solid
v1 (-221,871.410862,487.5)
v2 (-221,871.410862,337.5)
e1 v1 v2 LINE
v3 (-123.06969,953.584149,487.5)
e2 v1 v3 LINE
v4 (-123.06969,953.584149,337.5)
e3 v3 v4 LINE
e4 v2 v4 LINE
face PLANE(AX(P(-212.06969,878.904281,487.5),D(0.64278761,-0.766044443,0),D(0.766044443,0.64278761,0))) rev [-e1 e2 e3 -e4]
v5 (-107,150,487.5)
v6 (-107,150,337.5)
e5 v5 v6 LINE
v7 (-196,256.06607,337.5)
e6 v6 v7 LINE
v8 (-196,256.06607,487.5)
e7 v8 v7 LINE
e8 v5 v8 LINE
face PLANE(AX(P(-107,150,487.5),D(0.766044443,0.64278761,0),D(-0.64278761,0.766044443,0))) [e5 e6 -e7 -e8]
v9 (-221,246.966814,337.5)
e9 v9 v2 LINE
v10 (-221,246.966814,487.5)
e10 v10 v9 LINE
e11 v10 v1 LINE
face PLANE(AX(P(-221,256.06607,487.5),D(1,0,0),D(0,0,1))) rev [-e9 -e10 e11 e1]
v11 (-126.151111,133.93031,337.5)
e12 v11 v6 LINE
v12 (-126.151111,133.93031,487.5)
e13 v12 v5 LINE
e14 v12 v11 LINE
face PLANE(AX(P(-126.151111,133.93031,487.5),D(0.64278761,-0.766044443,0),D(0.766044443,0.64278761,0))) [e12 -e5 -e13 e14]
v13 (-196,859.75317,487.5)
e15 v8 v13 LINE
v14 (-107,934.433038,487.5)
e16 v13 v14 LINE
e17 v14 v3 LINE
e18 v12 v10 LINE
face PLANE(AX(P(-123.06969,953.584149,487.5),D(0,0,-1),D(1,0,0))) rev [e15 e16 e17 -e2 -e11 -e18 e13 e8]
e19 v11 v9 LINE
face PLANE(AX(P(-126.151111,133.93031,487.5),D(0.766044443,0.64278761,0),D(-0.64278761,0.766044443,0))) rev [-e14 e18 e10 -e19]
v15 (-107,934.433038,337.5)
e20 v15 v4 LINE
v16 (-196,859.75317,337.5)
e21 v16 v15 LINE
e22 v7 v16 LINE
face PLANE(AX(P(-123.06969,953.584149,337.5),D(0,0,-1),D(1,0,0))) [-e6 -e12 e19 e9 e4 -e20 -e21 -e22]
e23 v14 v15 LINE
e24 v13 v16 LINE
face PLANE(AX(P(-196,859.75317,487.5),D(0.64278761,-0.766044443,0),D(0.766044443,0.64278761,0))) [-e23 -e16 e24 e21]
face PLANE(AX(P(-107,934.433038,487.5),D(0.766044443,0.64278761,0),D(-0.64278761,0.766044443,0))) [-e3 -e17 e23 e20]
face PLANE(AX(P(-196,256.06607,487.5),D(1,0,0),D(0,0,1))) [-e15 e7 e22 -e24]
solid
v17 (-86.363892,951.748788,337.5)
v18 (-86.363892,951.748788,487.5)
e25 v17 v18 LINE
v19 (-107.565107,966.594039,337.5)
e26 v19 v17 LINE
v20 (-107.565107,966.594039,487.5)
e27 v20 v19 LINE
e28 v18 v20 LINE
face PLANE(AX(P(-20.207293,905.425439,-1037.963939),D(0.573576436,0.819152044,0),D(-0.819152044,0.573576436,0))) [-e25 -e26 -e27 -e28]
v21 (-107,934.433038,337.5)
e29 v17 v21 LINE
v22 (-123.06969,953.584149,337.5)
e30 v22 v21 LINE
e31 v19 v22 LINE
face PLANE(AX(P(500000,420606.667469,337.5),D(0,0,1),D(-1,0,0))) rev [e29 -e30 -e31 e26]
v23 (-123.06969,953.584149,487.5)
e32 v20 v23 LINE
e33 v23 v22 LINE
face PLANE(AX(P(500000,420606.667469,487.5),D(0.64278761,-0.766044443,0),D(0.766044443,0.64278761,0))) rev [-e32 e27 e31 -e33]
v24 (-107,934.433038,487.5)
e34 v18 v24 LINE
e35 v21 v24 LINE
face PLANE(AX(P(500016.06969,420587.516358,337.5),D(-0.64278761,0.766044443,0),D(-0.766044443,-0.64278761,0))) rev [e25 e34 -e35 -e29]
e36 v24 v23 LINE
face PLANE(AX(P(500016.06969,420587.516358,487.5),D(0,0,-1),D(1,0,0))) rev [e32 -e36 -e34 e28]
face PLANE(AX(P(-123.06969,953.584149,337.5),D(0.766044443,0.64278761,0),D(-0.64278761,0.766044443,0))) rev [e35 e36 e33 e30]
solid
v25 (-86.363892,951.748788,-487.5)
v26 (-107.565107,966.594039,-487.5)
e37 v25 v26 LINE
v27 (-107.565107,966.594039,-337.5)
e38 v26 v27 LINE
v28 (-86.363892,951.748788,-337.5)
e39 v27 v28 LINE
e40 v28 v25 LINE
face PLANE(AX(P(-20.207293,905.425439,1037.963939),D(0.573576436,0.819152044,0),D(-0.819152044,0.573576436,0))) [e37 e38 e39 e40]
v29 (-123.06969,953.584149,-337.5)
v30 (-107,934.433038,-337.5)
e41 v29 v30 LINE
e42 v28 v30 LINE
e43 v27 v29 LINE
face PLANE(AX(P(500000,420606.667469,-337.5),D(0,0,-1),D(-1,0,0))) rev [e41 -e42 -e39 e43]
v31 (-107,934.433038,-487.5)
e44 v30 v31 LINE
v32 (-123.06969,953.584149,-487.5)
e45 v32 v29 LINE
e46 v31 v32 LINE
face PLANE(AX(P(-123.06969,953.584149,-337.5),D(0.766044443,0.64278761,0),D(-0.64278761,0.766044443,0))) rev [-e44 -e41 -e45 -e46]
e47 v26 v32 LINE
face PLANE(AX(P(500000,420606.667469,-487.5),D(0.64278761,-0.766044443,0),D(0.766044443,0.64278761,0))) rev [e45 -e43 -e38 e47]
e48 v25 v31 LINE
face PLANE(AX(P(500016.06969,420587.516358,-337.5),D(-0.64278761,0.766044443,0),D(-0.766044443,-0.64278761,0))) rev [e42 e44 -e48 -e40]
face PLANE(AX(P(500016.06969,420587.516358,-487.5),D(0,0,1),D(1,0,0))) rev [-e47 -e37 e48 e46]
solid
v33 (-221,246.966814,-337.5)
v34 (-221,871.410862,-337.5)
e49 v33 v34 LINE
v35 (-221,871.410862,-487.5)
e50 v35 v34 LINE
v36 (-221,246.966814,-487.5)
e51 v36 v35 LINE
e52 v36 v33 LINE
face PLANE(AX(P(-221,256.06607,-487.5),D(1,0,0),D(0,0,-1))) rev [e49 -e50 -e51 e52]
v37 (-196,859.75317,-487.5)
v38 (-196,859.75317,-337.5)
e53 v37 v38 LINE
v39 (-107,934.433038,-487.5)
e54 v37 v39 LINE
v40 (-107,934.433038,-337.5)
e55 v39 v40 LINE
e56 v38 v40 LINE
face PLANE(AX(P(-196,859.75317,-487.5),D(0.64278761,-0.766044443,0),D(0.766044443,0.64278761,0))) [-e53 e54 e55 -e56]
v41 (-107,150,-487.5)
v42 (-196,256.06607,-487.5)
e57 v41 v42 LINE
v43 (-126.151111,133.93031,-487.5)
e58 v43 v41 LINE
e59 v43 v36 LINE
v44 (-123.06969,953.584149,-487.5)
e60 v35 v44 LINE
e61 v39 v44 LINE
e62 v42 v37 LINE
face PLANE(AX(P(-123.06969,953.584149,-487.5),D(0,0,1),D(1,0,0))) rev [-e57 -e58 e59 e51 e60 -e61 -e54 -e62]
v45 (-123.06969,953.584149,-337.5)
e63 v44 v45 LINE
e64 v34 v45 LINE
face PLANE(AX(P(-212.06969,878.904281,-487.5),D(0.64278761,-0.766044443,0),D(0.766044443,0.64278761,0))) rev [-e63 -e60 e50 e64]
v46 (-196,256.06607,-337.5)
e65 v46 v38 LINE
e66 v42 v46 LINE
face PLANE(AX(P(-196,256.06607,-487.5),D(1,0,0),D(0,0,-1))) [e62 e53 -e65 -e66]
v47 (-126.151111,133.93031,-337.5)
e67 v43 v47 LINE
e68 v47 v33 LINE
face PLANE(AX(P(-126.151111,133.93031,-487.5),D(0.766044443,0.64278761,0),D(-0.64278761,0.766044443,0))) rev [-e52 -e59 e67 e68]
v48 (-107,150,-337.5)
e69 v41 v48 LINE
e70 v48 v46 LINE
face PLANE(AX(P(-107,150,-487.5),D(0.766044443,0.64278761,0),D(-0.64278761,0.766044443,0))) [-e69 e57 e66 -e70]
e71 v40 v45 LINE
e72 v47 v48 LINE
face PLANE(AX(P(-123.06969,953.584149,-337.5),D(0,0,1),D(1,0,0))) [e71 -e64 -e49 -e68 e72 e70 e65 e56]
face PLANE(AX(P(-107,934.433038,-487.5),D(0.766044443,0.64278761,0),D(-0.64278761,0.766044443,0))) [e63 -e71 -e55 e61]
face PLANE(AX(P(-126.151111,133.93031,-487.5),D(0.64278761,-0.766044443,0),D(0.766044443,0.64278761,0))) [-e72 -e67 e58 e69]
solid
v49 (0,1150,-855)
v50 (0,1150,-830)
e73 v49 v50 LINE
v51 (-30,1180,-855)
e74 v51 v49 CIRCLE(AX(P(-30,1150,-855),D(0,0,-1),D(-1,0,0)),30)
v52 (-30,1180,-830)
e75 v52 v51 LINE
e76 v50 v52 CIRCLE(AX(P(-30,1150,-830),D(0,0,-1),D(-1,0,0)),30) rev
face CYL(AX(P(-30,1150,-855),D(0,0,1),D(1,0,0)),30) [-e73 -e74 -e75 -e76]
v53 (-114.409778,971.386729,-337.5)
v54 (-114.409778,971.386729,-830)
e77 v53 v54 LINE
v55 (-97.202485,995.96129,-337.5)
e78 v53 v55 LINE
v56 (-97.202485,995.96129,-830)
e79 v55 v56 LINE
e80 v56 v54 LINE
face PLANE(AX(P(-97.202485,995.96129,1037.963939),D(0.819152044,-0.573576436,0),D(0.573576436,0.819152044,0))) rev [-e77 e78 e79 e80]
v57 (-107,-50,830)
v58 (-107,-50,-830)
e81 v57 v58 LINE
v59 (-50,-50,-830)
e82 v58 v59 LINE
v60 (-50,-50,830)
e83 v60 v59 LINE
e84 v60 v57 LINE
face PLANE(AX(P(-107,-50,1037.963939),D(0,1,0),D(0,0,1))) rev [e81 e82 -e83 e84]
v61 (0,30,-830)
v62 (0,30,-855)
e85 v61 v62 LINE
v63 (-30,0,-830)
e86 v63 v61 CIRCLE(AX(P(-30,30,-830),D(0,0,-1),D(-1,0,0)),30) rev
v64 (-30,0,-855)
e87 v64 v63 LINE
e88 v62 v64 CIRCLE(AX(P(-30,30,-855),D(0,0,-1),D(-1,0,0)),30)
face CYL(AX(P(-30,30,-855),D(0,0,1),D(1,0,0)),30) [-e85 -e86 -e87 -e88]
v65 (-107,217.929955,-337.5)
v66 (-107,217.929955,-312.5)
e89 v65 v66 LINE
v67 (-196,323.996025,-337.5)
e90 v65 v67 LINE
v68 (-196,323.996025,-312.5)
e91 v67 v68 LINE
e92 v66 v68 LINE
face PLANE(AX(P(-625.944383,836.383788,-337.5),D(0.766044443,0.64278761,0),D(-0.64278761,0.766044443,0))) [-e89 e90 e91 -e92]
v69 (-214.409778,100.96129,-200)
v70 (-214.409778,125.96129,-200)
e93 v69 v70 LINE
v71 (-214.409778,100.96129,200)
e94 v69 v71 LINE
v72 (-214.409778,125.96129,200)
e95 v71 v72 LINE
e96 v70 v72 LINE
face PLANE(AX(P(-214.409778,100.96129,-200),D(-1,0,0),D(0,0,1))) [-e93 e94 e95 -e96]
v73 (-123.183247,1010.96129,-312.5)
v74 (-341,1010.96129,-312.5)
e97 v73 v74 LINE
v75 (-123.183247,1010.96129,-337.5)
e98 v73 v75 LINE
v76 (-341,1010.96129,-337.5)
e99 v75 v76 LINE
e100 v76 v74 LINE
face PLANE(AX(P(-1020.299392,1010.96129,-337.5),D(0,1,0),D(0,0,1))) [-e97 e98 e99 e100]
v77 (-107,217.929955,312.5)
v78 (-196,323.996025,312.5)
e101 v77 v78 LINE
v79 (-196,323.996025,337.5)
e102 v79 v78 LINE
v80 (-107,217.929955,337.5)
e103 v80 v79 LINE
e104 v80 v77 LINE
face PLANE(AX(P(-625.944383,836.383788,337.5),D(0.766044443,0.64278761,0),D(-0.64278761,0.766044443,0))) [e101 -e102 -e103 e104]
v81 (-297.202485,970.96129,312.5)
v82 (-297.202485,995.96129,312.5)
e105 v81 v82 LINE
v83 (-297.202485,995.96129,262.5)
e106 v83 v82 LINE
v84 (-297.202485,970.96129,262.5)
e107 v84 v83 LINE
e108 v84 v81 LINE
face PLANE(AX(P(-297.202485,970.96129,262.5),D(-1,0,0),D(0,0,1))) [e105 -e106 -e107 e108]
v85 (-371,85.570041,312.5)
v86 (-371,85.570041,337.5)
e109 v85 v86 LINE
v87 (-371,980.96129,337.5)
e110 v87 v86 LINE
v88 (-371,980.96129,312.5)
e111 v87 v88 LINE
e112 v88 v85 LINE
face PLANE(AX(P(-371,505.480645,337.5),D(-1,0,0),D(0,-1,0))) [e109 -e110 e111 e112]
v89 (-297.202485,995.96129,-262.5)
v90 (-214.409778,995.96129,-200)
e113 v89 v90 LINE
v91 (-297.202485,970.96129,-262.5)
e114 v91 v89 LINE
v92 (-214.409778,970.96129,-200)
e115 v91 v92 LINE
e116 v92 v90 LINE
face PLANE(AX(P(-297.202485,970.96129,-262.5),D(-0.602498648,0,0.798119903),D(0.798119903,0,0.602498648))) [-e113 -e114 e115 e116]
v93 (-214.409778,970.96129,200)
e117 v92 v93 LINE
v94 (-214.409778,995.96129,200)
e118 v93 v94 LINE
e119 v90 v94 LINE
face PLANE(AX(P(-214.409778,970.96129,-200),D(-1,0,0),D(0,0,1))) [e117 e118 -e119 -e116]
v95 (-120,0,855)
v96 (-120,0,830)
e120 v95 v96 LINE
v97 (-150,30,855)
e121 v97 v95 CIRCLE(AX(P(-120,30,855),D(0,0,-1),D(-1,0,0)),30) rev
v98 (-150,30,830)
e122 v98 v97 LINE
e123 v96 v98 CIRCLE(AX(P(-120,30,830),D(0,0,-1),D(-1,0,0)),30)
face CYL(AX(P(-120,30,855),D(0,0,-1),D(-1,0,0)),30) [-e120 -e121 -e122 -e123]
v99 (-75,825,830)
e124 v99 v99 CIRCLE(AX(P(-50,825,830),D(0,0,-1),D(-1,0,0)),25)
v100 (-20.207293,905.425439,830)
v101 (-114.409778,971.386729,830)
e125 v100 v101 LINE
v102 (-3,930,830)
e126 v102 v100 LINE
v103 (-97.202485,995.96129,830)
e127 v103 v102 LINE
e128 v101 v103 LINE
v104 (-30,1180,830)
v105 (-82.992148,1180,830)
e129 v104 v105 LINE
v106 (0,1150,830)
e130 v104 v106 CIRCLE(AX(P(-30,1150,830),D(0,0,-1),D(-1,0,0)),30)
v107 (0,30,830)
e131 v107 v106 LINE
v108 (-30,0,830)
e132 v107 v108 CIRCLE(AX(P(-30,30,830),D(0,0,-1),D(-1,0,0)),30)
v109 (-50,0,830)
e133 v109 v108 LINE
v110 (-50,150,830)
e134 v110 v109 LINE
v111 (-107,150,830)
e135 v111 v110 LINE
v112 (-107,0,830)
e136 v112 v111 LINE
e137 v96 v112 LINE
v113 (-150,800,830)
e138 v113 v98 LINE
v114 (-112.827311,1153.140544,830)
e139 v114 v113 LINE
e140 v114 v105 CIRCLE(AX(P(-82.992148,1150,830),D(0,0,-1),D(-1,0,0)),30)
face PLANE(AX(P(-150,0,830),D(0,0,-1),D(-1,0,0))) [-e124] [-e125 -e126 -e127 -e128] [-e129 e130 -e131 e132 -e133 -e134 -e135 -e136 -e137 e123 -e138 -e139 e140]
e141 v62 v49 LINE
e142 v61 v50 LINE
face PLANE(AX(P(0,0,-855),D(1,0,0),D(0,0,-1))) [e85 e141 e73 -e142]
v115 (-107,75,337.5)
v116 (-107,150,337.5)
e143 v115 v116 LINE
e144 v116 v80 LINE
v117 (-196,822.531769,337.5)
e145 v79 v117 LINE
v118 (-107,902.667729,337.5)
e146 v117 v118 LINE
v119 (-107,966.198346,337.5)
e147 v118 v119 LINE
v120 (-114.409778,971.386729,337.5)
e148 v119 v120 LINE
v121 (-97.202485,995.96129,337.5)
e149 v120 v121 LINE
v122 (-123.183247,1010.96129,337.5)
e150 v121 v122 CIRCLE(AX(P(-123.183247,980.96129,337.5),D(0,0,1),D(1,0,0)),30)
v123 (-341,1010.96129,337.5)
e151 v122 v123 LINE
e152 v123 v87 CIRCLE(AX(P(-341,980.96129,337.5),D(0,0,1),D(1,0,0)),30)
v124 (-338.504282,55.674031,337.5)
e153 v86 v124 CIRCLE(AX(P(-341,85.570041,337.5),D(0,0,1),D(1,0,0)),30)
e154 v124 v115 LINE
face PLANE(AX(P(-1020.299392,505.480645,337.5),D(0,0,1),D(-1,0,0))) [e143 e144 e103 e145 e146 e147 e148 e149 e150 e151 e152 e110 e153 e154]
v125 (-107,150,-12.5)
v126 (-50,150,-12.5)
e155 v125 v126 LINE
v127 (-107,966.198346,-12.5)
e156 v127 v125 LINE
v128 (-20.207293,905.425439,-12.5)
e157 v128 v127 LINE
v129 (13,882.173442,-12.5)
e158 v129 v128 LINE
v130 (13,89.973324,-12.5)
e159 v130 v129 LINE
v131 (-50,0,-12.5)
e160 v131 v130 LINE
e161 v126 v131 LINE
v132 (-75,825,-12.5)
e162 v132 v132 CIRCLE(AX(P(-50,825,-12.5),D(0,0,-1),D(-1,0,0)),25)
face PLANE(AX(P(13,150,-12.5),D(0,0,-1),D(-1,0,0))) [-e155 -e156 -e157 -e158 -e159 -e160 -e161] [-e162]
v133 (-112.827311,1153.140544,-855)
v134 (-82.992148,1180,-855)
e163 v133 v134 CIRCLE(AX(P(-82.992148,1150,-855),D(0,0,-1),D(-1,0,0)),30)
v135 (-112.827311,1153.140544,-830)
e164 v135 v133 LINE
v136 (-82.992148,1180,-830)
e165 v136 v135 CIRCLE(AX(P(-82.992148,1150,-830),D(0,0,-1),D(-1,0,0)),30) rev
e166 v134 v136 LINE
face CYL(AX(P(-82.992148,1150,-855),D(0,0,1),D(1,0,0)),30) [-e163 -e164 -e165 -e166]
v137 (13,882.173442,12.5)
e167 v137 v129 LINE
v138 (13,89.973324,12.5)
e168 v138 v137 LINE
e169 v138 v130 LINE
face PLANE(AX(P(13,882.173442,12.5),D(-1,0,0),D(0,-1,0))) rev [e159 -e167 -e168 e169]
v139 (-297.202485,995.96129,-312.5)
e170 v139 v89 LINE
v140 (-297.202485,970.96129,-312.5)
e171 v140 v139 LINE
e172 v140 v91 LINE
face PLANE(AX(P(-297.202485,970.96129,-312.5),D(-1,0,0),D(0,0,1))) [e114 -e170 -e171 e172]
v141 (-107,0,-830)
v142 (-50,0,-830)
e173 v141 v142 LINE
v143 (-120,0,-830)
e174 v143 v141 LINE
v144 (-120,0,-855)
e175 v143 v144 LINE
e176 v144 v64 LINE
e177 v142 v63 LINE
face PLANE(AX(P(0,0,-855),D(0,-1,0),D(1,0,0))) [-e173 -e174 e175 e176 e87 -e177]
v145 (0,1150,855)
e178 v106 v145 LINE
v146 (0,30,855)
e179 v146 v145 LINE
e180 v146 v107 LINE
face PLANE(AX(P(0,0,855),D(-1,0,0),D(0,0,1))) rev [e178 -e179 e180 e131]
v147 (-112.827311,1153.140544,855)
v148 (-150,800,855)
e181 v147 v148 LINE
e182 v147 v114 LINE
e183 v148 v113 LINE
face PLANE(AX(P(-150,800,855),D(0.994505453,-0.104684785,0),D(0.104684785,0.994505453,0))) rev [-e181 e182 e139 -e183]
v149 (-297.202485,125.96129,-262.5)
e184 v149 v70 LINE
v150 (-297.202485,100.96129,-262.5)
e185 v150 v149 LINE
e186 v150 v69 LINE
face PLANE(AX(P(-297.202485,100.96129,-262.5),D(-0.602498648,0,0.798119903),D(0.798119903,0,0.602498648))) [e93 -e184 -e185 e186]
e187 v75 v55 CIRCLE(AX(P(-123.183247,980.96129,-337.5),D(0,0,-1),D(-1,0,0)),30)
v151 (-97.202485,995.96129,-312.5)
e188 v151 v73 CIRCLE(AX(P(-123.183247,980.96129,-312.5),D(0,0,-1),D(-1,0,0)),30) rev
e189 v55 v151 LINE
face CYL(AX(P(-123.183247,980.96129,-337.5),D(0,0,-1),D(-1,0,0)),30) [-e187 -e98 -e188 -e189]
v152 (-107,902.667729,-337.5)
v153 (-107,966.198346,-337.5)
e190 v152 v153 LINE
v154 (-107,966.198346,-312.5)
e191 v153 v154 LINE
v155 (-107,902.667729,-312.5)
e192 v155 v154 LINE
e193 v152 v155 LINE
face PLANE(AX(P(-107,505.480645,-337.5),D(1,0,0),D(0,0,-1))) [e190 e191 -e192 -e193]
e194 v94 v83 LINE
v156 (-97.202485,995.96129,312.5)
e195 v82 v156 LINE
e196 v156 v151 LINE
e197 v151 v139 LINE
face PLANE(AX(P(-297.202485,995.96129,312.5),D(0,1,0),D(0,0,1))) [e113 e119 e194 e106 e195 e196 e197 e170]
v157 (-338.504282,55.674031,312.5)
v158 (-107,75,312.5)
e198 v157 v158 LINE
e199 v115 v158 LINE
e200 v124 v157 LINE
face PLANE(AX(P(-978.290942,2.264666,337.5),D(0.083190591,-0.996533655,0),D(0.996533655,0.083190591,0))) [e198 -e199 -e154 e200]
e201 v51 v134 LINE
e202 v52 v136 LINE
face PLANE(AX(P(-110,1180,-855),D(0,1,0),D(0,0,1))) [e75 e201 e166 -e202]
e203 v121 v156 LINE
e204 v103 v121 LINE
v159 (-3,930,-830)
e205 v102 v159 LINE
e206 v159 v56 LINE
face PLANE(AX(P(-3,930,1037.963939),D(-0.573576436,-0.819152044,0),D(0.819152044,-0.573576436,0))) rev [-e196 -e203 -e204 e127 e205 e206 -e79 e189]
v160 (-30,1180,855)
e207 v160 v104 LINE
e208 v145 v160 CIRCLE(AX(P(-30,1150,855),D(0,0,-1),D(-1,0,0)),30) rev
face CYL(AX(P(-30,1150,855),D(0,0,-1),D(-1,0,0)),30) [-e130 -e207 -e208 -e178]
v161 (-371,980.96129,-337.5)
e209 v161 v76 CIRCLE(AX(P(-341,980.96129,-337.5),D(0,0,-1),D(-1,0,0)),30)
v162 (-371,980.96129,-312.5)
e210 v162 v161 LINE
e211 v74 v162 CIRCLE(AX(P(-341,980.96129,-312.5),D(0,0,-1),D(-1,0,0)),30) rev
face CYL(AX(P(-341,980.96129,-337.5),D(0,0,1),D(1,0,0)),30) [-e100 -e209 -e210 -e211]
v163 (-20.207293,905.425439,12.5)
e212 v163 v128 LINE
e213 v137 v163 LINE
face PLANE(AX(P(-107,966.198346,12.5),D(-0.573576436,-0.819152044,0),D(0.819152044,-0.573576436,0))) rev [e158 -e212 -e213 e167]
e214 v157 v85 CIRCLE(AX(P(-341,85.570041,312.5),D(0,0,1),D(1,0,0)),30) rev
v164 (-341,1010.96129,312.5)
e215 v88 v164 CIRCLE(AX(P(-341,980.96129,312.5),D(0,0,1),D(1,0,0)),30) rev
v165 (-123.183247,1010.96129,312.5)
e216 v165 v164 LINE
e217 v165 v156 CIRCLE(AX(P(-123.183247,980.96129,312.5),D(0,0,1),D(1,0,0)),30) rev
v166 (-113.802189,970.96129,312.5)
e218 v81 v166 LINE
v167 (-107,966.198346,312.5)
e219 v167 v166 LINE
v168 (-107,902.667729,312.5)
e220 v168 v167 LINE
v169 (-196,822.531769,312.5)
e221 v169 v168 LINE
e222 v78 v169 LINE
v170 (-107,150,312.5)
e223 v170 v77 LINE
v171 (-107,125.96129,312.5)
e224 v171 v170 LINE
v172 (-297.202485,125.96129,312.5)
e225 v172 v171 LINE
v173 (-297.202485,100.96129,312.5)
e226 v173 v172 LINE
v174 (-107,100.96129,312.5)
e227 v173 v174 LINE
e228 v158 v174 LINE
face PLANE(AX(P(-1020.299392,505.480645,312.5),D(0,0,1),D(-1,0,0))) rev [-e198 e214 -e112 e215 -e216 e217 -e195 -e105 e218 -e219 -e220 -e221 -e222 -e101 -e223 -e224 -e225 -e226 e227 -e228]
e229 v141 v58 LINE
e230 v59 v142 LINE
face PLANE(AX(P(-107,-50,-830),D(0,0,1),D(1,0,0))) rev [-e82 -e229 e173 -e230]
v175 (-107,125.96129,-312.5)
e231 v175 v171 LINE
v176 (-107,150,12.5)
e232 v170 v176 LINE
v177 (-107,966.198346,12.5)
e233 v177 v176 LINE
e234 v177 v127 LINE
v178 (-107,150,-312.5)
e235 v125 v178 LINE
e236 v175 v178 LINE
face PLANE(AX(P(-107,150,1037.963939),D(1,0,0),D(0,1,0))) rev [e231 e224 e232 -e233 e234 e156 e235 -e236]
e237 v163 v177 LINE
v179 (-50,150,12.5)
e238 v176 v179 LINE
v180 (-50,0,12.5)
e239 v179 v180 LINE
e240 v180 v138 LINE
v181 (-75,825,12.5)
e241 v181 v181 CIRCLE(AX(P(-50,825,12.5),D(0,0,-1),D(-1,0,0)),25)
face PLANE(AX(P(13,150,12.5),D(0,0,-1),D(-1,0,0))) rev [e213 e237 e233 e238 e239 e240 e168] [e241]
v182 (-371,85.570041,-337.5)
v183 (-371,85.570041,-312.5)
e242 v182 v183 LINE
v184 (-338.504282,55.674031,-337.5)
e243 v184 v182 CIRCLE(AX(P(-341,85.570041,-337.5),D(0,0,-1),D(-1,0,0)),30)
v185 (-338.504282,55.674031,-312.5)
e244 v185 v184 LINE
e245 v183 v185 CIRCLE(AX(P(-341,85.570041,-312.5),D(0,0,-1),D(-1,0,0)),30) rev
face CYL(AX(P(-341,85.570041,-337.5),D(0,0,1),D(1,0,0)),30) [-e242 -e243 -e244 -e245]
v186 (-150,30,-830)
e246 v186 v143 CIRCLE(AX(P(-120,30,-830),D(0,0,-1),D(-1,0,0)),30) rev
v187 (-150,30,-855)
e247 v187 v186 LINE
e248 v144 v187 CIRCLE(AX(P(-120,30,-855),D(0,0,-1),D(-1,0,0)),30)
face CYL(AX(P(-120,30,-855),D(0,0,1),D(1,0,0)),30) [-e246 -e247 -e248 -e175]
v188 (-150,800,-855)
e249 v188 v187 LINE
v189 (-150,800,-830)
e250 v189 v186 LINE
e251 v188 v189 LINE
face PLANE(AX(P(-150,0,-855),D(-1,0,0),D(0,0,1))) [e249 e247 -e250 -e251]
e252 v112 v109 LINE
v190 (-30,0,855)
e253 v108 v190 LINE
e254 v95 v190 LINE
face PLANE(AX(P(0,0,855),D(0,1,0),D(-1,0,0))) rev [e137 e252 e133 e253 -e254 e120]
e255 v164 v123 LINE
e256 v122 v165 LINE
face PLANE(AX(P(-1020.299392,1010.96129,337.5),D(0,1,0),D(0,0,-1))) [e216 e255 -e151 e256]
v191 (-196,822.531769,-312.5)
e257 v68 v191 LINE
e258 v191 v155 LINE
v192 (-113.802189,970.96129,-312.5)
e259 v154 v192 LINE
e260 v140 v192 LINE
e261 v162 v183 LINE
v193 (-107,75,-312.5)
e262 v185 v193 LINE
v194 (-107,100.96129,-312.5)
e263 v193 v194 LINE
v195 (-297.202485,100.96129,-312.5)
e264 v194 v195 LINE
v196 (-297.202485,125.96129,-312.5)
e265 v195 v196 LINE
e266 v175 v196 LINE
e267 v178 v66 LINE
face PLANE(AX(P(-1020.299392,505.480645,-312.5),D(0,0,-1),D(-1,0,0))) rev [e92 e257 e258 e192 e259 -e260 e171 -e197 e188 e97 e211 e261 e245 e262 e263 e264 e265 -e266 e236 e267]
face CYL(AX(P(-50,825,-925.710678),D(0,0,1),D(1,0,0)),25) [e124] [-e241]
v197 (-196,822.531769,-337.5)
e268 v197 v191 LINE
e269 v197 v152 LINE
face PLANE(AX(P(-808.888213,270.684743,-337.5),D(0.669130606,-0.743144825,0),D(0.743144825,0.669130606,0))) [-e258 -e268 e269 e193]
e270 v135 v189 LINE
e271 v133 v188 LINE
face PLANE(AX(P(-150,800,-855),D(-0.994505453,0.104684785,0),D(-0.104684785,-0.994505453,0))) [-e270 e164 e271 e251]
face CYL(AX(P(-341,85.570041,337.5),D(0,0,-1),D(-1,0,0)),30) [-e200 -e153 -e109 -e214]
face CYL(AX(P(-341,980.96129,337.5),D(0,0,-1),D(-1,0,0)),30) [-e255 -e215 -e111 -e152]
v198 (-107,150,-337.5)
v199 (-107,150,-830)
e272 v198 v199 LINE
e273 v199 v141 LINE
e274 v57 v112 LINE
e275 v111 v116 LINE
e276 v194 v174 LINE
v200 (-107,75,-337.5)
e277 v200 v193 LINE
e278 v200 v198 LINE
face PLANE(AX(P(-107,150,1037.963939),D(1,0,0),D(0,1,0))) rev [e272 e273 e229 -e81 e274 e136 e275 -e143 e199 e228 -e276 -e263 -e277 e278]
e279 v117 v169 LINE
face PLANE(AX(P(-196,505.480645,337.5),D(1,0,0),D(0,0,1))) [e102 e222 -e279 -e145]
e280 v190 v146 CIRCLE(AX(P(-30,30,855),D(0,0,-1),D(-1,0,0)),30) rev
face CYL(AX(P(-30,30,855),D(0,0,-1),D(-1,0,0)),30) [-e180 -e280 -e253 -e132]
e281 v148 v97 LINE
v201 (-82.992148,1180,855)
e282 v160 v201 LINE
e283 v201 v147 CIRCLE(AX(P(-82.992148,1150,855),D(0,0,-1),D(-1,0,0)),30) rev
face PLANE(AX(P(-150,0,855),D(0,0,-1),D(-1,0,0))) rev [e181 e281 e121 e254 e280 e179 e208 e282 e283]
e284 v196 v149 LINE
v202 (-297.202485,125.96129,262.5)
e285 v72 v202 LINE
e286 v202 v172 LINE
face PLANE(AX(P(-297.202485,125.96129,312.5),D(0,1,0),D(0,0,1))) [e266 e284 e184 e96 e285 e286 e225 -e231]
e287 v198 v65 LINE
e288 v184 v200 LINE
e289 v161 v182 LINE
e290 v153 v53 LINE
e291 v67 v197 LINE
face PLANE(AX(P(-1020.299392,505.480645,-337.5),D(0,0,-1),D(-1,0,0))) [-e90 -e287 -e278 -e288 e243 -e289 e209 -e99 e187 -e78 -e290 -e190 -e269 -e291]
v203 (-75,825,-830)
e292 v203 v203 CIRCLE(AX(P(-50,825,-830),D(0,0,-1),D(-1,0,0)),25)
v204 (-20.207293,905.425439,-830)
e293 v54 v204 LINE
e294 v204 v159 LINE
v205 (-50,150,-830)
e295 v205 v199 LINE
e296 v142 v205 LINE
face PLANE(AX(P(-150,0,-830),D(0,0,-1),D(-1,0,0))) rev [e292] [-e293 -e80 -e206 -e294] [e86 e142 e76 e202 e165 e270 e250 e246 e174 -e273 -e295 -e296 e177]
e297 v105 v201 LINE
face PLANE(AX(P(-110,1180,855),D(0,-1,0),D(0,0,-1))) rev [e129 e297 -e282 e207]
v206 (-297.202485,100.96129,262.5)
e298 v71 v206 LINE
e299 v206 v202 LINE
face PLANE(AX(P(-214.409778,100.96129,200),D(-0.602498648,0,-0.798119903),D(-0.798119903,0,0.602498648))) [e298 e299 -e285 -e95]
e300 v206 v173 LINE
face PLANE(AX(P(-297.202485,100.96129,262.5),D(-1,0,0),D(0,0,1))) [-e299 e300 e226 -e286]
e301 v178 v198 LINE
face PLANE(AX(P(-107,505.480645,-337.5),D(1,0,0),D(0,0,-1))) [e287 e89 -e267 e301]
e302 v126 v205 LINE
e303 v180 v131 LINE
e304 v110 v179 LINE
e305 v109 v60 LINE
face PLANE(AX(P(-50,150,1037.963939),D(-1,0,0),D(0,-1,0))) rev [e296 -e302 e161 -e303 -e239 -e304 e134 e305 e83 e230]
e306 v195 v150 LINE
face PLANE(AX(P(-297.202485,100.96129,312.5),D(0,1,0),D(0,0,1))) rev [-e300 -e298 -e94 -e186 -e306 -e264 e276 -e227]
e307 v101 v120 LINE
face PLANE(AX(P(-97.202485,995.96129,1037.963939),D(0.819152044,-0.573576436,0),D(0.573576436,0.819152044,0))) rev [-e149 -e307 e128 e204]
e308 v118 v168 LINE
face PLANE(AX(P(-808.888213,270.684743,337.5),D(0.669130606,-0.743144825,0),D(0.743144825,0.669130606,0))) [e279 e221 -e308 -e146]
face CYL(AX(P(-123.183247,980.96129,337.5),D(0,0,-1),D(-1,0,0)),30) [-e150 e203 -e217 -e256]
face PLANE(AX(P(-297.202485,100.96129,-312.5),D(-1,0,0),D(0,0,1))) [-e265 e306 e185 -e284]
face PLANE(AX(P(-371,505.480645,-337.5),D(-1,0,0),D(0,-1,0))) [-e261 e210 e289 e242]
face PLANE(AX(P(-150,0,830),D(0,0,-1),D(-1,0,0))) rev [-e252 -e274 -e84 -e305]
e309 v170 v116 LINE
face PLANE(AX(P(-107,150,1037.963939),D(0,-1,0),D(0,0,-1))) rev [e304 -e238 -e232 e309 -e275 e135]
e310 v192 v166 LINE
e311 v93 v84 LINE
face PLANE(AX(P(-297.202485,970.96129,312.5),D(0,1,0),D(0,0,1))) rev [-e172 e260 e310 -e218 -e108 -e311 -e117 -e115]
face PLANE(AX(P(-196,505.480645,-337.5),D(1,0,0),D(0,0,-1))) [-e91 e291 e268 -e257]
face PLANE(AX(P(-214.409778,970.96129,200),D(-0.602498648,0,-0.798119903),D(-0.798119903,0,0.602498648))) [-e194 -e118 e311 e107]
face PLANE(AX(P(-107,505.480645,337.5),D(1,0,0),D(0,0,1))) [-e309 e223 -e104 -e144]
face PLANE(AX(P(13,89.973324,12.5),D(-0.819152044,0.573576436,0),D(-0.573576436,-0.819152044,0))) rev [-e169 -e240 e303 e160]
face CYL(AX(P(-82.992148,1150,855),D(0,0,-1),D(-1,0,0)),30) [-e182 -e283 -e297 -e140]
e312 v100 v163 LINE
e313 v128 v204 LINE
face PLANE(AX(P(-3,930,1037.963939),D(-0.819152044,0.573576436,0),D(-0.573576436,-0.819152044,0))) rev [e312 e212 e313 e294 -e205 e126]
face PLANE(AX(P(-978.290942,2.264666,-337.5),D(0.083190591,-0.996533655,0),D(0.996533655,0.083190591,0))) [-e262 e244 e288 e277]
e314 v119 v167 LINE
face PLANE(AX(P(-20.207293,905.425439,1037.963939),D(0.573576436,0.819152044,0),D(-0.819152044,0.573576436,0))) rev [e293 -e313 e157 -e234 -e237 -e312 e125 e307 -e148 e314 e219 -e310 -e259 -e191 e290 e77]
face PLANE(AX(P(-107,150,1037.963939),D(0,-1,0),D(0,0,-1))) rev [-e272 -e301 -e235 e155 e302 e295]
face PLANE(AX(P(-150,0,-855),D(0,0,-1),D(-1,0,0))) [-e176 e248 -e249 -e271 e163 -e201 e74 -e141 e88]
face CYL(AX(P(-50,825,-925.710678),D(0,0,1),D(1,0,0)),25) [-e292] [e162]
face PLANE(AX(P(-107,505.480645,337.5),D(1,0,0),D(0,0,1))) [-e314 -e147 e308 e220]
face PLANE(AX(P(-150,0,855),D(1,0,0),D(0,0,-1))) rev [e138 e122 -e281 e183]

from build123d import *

# Parameters (mm, degrees)
BOSS_EXTRUDE1_START = 830
BOSS_EXTRUDE1_DEPTH = 25
BOSS_EXTRUDE2_START = -830
BOSS_EXTRUDE2_DEPTH = 25
SKETCH2_W           = 57
SKETCH2_H           = 200
BOSS_EXTRUDE3_DEPTH = 1660
BOSS_EXTRUDE4_DEPTH = 12.5
SKETCH4_R           = 25
CUT_EXTRUDE1_DEPTH  = 2084.026644093
SKETCH5_R           = 25
BOSS_EXTRUDE5_DEPTH = 1710
BOSS_EXTRUDE6_START = 300
BOSS_EXTRUDE6_DEPTH = 25
EXTRUDE_THIN1_DEPTH = 150
BOSS_EXTRUDE7_REACH = 1429.616
SKETCH9_W           = 150
SKETCH9_H           = 25
BOSS_EXTRUDE8_DEPTH = 25
LPATTERN1_COUNT     = 2
LPATTERN1_PITCH     = 870
FILLET1_R           = 30


with BuildPart() as part:
    # Sketch1 → Boss-Extrude1 (new body)
    with BuildSketch(Plane.XY.offset(BOSS_EXTRUDE1_START)):
        Polygon((0, 0), (0, 1180), (-110, 1180), (-150, 800), (-150, 0), align=None)
    extrude(amount=BOSS_EXTRUDE1_DEPTH)



with BuildPart() as body_2:
    # Sketch1<2> → Boss-Extrude2 (new body)
    with BuildSketch(Plane.XY.offset(BOSS_EXTRUDE2_START)):
        Polygon((0, 0), (0, 1180), (-110, 1180), (-150, 800), (-150, 0), align=None)
    extrude(amount=-BOSS_EXTRUDE2_DEPTH)


with BuildPart() as part_1:
    add(part.part)

    add(body_2.part)  # Boss-Extrude3 merges body 2
    # Sketch2 → Boss-Extrude3 (add)
    with BuildSketch(Plane.XY.offset(-830)):
        Polygon((-3, 930), (-20.207293091, 905.425438671), (-114.409778184, 971.386728852), (-97.202485093, 995.96129018), align=None)
        with Locations((-78.5, 50)):
            Rectangle(SKETCH2_W, SKETCH2_H)
    extrude(amount=BOSS_EXTRUDE3_DEPTH)

    # Sketch3 → Boss-Extrude4 (add, symmetric)
    with BuildSketch(Plane.XY):
        Polygon((-107, 966.198346311), (13, 882.173441726), (13, 89.973324425), (-50, 0), (-50, 150), (-107, 150), align=None)
    extrude(amount=BOSS_EXTRUDE4_DEPTH, both=True)

    # Sketch4 → Cut-Extrude1 (cut, through all)
    with BuildSketch(Plane.XY.offset(855)):
        with Locations((-50, 825)):
            Circle(SKETCH4_R)
    extrude(amount=-CUT_EXTRUDE1_DEPTH, mode=Mode.SUBTRACT)

    # Sketch5 → Boss-Extrude5 (add)
    with BuildSketch(Plane.XY.offset(855)):
        with Locations(Location((-50, 825, 0), (0, 0, 180))):
            Circle(SKETCH5_R)
    extrude(amount=-BOSS_EXTRUDE5_DEPTH)

    # Sketch7 → Boss-Extrude6 (add)
    with BuildSketch(Plane(origin=(0, 0, -12.5), x_dir=(-1, 0, 0), z_dir=(0, 0, -1)).offset(BOSS_EXTRUDE6_START)):
        Polygon((97.202485093, 995.96129018), (114.409778184, 971.386728852), (107, 966.198346311), (107, 902.667728725), (196, 822.531768783), (196, 323.996024519), (107, 217.929954778), (107, 150), (107, 75), (371, 52.96129018), (371, 1010.96129018), (97.202485093, 1010.96129018), align=None)
    extrude(amount=BOSS_EXTRUDE6_DEPTH)


with BuildPart() as body_2_2:
    # Sketch8 → Extrude-Thin1 (new body)
    with BuildSketch(Plane(origin=(0, 0, -337.5), x_dir=(-1, 0, 0), z_dir=(0, 0, -1))):
        Polygon((107, 150), (196, 256.066069741), (196, 859.753170343), (107, 934.433037518), (123.069690242, 953.584148596), (221, 871.410861797), (221, 246.966813884), (126.151111078, 133.930309758), align=None)
    extrude(amount=EXTRUDE_THIN1_DEPTH)


with BuildPart() as body_3:
    # Boss-Extrude7: up to this plane
    boss_extrude7_end = Plane(origin=(-20.207293091, 905.425438671, 1037.963939182), z_dir=(0.5735764363510444, 0.819152044288993, 0))
    # Sketch9 → Boss-Extrude7 (new, up to the surface)
    with BuildSketch(Plane(origin=(397.328272504, 333.398006914, 0), x_dir=(0, 0, -1), z_dir=(0.7660444431189795, 0.6427876096865376, 0)), mode=Mode.PRIVATE) as boss_extrude7_sk1:
        with Locations((412.5, 797.095510094)):
            Rectangle(SKETCH9_W, SKETCH9_H)
    boss_extrude7_tool1 = split(extrude(boss_extrude7_sk1.sketch, amount=BOSS_EXTRUDE7_REACH, mode=Mode.PRIVATE), bisect_by=boss_extrude7_end, keep=Keep.BOTH, mode=Mode.PRIVATE)
    add(boss_extrude7_tool1.solids().sort_by_distance((-115.034845, 944.008593, -412.5))[0])


with BuildPart() as body_4:
    # Mirror5: mirrored copy
    add(body_2_2.part.mirror(Plane.XY))


with BuildPart() as body_5:
    # Mirror5 2: mirrored copy
    add(body_3.part.mirror(Plane.XY))


with BuildPart() as body_6:
    # Mirror5 3: mirrored copy
    add(part_1.part.mirror(Plane.XY))


with BuildPart() as part_2:
    add(part_1.part)

    add(body_6.part)  # Boss-Extrude8 merges body 6
    # Sketch11 → Boss-Extrude8 (add)
    with BuildSketch(Plane(origin=(0, 995.96129018, 0), x_dir=(-1, 0, 0), z_dir=(0, 1, 0))):
        Polygon((297.202485093, 312.5), (97.202485093, 312.5), (97.202485093, -312.5), (297.202485093, -312.5), (297.202485093, -262.5), (214.409778184, -200), (214.409778184, 200), (297.202485093, 262.5), align=None)
    boss_extrude8 = extrude(amount=-BOSS_EXTRUDE8_DEPTH)

    # LPattern1: Boss-Extrude8 ×2
    with Locations(*[(0, -i * LPATTERN1_PITCH, 0) for i in range(1, LPATTERN1_COUNT)]):
        add(boss_extrude8)

    # Fillet1
    # the kernel refuses this fillet: 30 mm, written as the material it takes off along each edge
    with BuildSketch(Plane(origin=(-97.202485093, 1010.96129018, -247.548094716), x_dir=(0, -1, 0), z_dir=(0, 0, -1))) as fillet1_piece_1:
        with BuildLine():
            CenterArc((30, 25.980762114), FILLET1_R, 180, 60)
            Line((0, 25.980762114), (-0.6, 25.980762114))
            Line((-0.6, 25.980762114), (-0.6, 0))
            Line((-0.6, 0), (0, -0.6))
            ThreePointArc((0, -0.6), (7.5, -0.6), (14.7, -0.519615242))
            Line((14.7, -0.519615242), (15, 0))
        make_face()
    extrude(amount=154.903810568, mode=Mode.SUBTRACT)
    with BuildSketch(Plane(origin=(-97.202485093, 1010.96129018, 247.548094716), x_dir=(0, -1, 0), z_dir=(0, 0, 1))) as fillet1_piece_2:
        with BuildLine():
            CenterArc((30, -25.980762114), FILLET1_R, 120, 60)
            Line((0, -25.980762114), (-0.6, -25.980762114))
            Line((-0.6, -25.980762114), (-0.6, 0))
            Line((-0.6, 0), (0, 0.6))
            ThreePointArc((0, 0.6), (7.5, 0.6), (14.7, 0.519615242))
            Line((14.7, 0.519615242), (15, 0))
        make_face()
    extrude(amount=154.903810568, mode=Mode.SUBTRACT)
    with BuildSketch(Plane(origin=(-371, 1010.96129018, -237.5), x_dir=(1, 0, 0), z_dir=(0, 0, -1)), Plane(origin=(0, 1180, -755), x_dir=(0, -1, 0), z_dir=(0, 0, -1)), Plane(origin=(-150, 0, 755), x_dir=(1, 0, 0), z_dir=(0, 0, 1)), Plane(origin=(-371, 1010.96129018, 237.5), x_dir=(0, -1, 0), z_dir=(0, 0, 1))) as fillet1_piece_3:
        with BuildLine():
            CenterArc((FILLET1_R, FILLET1_R), FILLET1_R, 180, 90)
            Line((0, FILLET1_R), (-FILLET1_R * 0.02, FILLET1_R))
            Line((-FILLET1_R * 0.02, FILLET1_R), (-FILLET1_R * 0.02, -FILLET1_R * 0.02))
            Line((-FILLET1_R * 0.02, -FILLET1_R * 0.02), (FILLET1_R, -FILLET1_R * 0.02))
            Line((FILLET1_R, -FILLET1_R * 0.02), (FILLET1_R, 0))
        make_face()
    extrude(amount=175, mode=Mode.SUBTRACT)
    with BuildSketch(Plane(origin=(-110, 1180, 762.480369048), x_dir=(1, 0, 0), z_dir=(0, 0, 1))) as fillet1_piece_4:
        with BuildLine():
            CenterArc((FILLET1_R * 0.900261746029, -FILLET1_R), FILLET1_R, 90, 83.990994043)
            Line((-FILLET1_R * 0.0942437068928, -FILLET1_R * 0.895315215482), (-FILLET1_R * 0.114133815951, -FILLET1_R * 0.893221519792))
            Line((-FILLET1_R * 0.114133815951, -FILLET1_R * 0.893221519792), (-FILLET1_R * 0.0180052349206, FILLET1_R * 0.02))
            Line((-FILLET1_R * 0.0180052349206, FILLET1_R * 0.02), (FILLET1_R * 0.900261746029, FILLET1_R * 0.02))
            Line((FILLET1_R * 0.900261746029, FILLET1_R * 0.02), (FILLET1_R * 0.900261746029, 0))
        make_face()
    extrude(amount=160.039261904, mode=Mode.SUBTRACT)
    with BuildSketch(Plane(origin=(0, 1180, 755), x_dir=(0, -1, 0), z_dir=(0, 0, 1)), Plane(origin=(0, 0, -755), x_dir=(0, 1, 0), z_dir=(0, 0, -1)), Plane(origin=(0, 0, 755), x_dir=(-1, 0, 0), z_dir=(0, 0, 1)), Plane(origin=(-150, 0, -755), x_dir=(1, 0, 0), z_dir=(0, 0, -1))) as fillet1_piece_5:
        with BuildLine():
            CenterArc((FILLET1_R, -FILLET1_R), FILLET1_R, 90, 90)
            Line((0, -FILLET1_R), (-FILLET1_R * 0.02, -FILLET1_R))
            Line((-FILLET1_R * 0.02, -FILLET1_R), (-FILLET1_R * 0.02, FILLET1_R * 0.02))
            Line((-FILLET1_R * 0.02, FILLET1_R * 0.02), (FILLET1_R, FILLET1_R * 0.02))
            Line((FILLET1_R, FILLET1_R * 0.02), (FILLET1_R, 0))
        make_face()
    extrude(amount=175, mode=Mode.SUBTRACT)
    with BuildSketch(Plane(origin=(-110, 1180, -762.480369048), x_dir=(1, 0, 0), z_dir=(0, 0, -1))) as fillet1_piece_6:
        with BuildLine():
            CenterArc((FILLET1_R * 0.900261746029, FILLET1_R), FILLET1_R, 186.009005957, 83.990994043)
            Line((-FILLET1_R * 0.0942437068928, FILLET1_R * 0.895315215482), (-FILLET1_R * 0.114133815951, FILLET1_R * 0.893221519792))
            Line((-FILLET1_R * 0.114133815951, FILLET1_R * 0.893221519792), (-FILLET1_R * 0.0180052349206, -FILLET1_R * 0.02))
            Line((-FILLET1_R * 0.0180052349206, -FILLET1_R * 0.02), (FILLET1_R * 0.900261746029, -FILLET1_R * 0.02))
            Line((FILLET1_R * 0.900261746029, -FILLET1_R * 0.02), (FILLET1_R * 0.900261746029, 0))
        make_face()
    extrude(amount=160.039261904, mode=Mode.SUBTRACT)
    with BuildSketch(Plane(origin=(-371, 52.96129018, 230.978122717), x_dir=(0.9965336550031195, 0.08319059109132182, 0), z_dir=(0, 0, 1))) as fillet1_piece_7:
        with BuildLine():
            CenterArc((FILLET1_R * 1.08695836378, FILLET1_R), FILLET1_R, 175.228015178, 94.771984822)
            Line((FILLET1_R * 0.0904247087743, FILLET1_R * 1.08319059109), (FILLET1_R * 0.0704940356742, FILLET1_R * 1.08485440291))
            Line((FILLET1_R * 0.0704940356742, FILLET1_R * 1.08485440291), (-FILLET1_R * 0.0217391672755, -FILLET1_R * 0.02))
            Line((-FILLET1_R * 0.0217391672755, -FILLET1_R * 0.02), (FILLET1_R * 1.08695836378, -FILLET1_R * 0.02))
            Line((FILLET1_R * 1.08695836378, -FILLET1_R * 0.02), (FILLET1_R * 1.08695836378, 0))
        make_face()
    extrude(amount=188.043754567, mode=Mode.SUBTRACT)
    with BuildSketch(Plane(origin=(-371, 52.96129018, -230.978122717), x_dir=(0.9965336550031195, 0.08319059109132182, 0), z_dir=(0, 0, -1))) as fillet1_piece_8:
        with BuildLine():
            CenterArc((FILLET1_R * 1.08695836378, -FILLET1_R), FILLET1_R, 90, 94.771984822)
            Line((FILLET1_R * 0.0904247087743, -FILLET1_R * 1.08319059109), (FILLET1_R * 0.0704940356742, -FILLET1_R * 1.08485440291))
            Line((FILLET1_R * 0.0704940356742, -FILLET1_R * 1.08485440291), (-FILLET1_R * 0.0217391672755, FILLET1_R * 0.02))
            Line((-FILLET1_R * 0.0217391672755, FILLET1_R * 0.02), (FILLET1_R * 1.08695836378, FILLET1_R * 0.02))
            Line((FILLET1_R * 1.08695836378, FILLET1_R * 0.02), (FILLET1_R * 1.08695836378, 0))
        make_face()
    extrude(amount=188.043754567, mode=Mode.SUBTRACT)


solid = Compound([body_2_2.part, body_3.part, body_4.part, body_5.part, part_2.part])
